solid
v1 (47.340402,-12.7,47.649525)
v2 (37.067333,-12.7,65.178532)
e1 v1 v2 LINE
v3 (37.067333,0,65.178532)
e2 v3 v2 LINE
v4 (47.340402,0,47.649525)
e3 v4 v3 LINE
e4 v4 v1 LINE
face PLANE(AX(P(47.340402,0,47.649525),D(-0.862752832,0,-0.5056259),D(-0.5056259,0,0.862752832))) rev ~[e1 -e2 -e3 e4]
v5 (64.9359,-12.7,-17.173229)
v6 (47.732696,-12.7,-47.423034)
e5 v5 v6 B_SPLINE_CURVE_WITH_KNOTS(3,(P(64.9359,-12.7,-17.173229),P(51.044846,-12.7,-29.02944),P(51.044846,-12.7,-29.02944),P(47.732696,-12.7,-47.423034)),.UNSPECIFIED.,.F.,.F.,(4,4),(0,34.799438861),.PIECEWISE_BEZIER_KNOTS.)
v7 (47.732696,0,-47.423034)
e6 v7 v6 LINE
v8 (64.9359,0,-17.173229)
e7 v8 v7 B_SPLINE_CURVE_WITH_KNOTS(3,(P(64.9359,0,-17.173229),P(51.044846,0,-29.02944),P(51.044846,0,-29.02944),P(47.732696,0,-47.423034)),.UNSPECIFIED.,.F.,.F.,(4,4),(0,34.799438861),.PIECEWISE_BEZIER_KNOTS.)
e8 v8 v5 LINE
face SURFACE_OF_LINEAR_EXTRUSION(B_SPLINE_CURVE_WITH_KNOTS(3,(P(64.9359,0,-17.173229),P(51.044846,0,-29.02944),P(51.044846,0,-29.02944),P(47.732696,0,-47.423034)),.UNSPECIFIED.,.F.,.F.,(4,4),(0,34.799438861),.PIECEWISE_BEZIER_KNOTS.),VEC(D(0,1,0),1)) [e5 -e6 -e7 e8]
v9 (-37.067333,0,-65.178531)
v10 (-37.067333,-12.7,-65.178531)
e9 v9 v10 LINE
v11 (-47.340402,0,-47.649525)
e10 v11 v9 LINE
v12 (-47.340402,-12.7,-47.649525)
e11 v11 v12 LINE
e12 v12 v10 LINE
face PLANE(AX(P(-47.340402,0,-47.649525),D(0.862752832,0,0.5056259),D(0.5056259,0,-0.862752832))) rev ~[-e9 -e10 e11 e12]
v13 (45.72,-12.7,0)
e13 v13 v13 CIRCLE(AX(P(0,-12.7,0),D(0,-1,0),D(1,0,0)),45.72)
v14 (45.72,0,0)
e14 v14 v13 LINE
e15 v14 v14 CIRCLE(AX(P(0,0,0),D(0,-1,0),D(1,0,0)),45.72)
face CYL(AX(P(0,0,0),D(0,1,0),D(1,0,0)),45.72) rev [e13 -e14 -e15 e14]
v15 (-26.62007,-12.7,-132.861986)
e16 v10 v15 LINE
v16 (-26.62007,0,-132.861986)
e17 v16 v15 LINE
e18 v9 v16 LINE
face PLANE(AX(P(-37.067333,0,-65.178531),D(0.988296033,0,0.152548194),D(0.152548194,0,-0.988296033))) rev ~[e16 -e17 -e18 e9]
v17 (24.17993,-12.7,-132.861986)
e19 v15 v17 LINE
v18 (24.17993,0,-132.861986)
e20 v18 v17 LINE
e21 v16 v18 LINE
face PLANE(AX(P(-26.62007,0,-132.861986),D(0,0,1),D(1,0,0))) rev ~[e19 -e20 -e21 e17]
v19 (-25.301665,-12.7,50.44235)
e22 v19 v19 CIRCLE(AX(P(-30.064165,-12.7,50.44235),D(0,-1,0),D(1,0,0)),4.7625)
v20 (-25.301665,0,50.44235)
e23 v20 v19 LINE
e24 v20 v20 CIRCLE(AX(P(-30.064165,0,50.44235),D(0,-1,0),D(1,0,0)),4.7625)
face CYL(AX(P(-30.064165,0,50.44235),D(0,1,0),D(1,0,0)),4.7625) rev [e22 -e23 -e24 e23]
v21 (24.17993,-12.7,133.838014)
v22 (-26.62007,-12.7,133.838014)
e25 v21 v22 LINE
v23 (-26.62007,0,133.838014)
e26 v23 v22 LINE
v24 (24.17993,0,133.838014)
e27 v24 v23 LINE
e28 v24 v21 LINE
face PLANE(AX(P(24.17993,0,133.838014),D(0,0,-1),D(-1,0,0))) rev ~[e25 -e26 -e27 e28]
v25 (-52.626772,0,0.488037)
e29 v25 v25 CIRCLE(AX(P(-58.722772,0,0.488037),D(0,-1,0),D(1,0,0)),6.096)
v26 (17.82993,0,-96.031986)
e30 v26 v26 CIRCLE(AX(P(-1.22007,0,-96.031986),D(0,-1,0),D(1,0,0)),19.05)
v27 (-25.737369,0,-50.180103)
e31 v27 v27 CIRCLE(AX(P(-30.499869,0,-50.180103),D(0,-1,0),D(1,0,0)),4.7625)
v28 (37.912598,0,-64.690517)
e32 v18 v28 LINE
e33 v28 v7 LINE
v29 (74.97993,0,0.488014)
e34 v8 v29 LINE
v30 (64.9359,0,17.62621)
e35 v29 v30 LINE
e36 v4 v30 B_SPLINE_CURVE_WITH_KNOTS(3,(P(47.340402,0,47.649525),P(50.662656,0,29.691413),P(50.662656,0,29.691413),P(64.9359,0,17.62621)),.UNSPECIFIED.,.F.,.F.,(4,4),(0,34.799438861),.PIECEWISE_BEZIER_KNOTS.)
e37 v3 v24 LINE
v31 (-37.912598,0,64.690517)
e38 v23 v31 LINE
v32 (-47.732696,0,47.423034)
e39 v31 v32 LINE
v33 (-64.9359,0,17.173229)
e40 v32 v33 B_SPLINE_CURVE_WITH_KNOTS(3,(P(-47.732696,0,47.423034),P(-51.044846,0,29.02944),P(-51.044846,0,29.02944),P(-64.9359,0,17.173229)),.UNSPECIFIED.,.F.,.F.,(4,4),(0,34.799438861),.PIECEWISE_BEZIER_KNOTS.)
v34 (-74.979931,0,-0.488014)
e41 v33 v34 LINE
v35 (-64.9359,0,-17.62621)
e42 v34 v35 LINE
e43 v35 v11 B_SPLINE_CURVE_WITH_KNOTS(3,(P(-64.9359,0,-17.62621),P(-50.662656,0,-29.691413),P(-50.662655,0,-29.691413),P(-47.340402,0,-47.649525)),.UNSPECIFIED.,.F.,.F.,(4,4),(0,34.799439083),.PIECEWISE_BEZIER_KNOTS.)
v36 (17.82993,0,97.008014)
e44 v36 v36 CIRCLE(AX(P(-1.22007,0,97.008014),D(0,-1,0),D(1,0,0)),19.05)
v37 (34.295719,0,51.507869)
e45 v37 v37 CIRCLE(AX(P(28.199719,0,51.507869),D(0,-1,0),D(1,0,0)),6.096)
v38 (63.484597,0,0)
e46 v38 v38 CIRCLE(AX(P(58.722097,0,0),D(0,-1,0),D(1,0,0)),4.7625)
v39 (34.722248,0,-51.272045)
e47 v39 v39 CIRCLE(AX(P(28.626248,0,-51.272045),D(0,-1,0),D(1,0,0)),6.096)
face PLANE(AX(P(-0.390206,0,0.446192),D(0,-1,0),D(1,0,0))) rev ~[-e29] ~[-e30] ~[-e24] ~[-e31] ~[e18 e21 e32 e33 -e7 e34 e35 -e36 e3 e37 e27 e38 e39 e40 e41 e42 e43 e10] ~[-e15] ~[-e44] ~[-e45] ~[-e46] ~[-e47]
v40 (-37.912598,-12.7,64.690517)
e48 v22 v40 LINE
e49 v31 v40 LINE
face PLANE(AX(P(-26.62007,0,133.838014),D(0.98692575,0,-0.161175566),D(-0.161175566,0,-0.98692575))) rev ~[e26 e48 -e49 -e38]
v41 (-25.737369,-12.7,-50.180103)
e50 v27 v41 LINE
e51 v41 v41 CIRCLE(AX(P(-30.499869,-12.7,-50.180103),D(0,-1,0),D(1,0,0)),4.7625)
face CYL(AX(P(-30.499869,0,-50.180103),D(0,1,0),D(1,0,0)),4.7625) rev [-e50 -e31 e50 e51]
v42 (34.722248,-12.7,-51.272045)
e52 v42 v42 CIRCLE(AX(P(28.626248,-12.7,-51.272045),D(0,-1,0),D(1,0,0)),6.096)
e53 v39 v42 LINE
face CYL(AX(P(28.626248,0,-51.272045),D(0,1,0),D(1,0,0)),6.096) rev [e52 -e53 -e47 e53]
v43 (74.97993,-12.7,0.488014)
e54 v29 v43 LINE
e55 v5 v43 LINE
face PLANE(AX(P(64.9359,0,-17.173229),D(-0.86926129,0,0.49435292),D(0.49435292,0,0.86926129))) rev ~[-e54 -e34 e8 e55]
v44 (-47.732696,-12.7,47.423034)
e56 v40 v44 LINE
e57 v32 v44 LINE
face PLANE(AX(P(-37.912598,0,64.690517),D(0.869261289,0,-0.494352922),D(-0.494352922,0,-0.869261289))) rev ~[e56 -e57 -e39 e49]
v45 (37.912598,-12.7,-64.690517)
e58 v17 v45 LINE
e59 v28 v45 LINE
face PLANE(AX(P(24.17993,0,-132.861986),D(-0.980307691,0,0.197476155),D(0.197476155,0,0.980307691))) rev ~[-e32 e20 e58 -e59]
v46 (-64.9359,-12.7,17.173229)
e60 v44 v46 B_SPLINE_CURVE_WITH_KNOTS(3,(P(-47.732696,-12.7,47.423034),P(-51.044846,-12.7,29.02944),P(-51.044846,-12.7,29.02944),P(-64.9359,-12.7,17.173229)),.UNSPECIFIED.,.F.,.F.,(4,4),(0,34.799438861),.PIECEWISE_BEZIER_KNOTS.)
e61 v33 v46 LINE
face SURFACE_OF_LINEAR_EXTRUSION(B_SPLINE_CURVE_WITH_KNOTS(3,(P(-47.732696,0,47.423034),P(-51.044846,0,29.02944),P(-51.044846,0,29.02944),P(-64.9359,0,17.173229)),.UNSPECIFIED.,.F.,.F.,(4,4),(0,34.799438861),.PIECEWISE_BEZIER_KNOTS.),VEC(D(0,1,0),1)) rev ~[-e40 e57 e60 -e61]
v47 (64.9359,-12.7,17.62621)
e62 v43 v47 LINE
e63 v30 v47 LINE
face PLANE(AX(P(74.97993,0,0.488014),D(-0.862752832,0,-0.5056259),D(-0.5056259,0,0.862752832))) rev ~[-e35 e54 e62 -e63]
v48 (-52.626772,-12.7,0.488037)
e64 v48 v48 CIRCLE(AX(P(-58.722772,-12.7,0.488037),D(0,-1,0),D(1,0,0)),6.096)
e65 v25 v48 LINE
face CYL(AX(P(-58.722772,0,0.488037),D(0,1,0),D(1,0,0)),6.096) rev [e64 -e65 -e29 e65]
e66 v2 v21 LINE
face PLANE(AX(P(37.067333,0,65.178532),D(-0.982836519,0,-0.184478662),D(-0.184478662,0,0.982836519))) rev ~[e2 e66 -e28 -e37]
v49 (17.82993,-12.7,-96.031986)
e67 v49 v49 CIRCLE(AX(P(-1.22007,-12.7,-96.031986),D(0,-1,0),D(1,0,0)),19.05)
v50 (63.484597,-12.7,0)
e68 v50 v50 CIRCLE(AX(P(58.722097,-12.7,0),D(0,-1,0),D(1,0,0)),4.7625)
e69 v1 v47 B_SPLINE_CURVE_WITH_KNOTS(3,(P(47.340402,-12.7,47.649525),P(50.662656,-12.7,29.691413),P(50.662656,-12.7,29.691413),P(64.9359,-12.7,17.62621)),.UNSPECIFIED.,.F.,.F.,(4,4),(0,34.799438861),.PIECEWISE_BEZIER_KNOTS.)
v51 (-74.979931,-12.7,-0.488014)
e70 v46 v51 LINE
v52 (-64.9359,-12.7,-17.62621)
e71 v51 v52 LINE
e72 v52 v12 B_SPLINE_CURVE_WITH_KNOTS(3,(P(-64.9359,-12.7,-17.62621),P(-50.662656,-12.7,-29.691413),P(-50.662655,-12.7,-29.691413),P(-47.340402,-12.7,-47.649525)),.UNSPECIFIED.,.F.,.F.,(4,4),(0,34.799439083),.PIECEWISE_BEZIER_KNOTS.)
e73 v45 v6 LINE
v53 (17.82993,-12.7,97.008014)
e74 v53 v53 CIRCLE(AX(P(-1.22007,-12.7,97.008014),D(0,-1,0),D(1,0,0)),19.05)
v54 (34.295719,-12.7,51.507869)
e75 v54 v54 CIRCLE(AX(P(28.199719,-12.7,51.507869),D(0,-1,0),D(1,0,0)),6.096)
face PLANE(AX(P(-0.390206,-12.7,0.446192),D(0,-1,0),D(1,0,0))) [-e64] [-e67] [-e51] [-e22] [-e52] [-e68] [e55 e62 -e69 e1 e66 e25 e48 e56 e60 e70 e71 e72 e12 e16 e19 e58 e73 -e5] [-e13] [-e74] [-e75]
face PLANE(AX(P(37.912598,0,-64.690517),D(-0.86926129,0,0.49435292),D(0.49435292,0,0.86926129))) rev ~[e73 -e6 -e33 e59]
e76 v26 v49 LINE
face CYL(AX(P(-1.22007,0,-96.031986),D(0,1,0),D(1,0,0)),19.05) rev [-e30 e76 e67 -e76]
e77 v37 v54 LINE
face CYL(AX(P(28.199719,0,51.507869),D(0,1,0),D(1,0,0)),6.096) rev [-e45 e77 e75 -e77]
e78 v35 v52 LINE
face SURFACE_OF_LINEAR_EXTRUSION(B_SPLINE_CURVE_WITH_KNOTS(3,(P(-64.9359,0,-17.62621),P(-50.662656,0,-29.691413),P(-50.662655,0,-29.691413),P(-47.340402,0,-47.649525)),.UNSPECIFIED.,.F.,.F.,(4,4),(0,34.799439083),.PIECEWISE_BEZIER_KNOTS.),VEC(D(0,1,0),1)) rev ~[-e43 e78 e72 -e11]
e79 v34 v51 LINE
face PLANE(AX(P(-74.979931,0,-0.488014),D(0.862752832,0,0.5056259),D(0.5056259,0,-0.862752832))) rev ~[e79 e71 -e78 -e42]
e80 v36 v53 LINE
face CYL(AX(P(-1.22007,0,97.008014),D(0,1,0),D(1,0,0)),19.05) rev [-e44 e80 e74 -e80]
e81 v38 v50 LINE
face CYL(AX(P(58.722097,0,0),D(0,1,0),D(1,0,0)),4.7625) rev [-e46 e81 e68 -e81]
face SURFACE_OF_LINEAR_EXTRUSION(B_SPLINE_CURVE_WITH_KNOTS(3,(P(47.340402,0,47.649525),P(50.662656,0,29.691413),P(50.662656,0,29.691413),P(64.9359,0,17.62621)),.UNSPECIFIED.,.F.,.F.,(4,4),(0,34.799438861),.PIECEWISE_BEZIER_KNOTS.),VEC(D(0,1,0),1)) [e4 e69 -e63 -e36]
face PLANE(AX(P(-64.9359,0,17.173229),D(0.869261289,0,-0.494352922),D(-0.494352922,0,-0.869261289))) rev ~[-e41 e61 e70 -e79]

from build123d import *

# Parameters (mm, degrees)
F0_R     = 19.05
F0_R_2   = 4.7625
F0_R_3   = 6.096
F0_R_4   = 45.72
F1_DEPTH = 12.7


# Not quite as in the source:
# - ends of sketch curves that miss each other by under 0.0002 mm in the source are joined


with BuildPart() as f1:
    # F0 (on Front) → F1 (new body)
    with BuildSketch(Plane.XZ):
        with BuildLine():
            Line((37.0673326191, 65.1785315794), (24.1799304387, 133.8380140911))
            Line((24.1799304387, 133.8380140911), (-26.6200695613, 133.8380140911))
            Line((-26.6200695613, 133.8380140911), (-37.9125978196, 64.6905174884))
            Line((-37.9125978196, 64.6905174884), (-47.7326956793, 47.4230339812))
            add(Edge.make_bspline(
                [(-47.7326956793, 47.4230339812), (-51.0448461758, 29.0294404336), (-51.0448462531, 29.0294404776), (-64.9358999582, 17.1732288977)],
                knots=[0, 0, 0, 0, 34.7994388611, 34.7994388611, 34.7994388611, 34.7994388611], degree=3))
            Line((-64.9358999582, 17.1732288977), (-74.9799305502, -0.4880138996))
            Line((-74.9799305502, -0.4880138996), (-64.9359000035, -17.6262099378))
            add(Edge.make_bspline(
                [(-64.9359000035, -17.6262099378), (-50.6626559715, -29.6914131837), (-50.6626551721, -29.6914132451), (-47.3404022927, -47.649524558)],
                knots=[0, 0, 0, 0, 34.7994390827, 34.7994390827, 34.7994390827, 34.7994390827], degree=3))
            Line((-47.3404022927, -47.649524558), (-37.0673327313, -65.1785313884))
            Line((-37.0673327313, -65.1785313884), (-26.6200695613, -132.8619859089))
            Line((-26.6200695613, -132.8619859089), (24.1799304387, -132.8619859089))
            Line((24.1799304387, -132.8619859089), (37.9125978196, -64.6905174884))
            Line((37.9125978196, -64.6905174884), (47.7326956902, -47.4230338593))
            add(Edge.make_bspline(
                [(64.9358998918, -17.1732287319), (51.0448461867, -29.0294403117), (51.0448461867, -29.0294403117), (47.7326956902, -47.4230338593)],
                knots=[0, 0, 0, 0, 34.7994388611, 34.7994388611, 34.7994388611, 34.7994388611], degree=3))
            Line((64.9358998918, -17.1732287319), (74.9799304387, 0.4880140911))
            Line((74.9799304387, 0.4880140911), (64.9358998918, 17.6262101292))
            add(Edge.make_bspline(
                [(47.3404022927, 47.649524558), (50.662655861, 29.6914133741), (50.662655861, 29.6914133741), (64.9358998918, 17.6262101292)],
                knots=[0, 0, 0, 0, 34.7994388611, 34.7994388611, 34.7994388611, 34.7994388611], degree=3))
            Line((47.3404022927, 47.649524558), (37.0673326191, 65.1785315794))
        make_face()
        with Locations((-1.2200695613, -96.0319859089)):
            Circle(F0_R, mode=Mode.SUBTRACT)
        with Locations((-30.4998691349, -50.180102728)):
            Circle(F0_R_2, mode=Mode.SUBTRACT)
        with Locations((28.6262483892, -51.2720453093)):
            Circle(F0_R_3, mode=Mode.SUBTRACT)
        Circle(F0_R_4, mode=Mode.SUBTRACT)
        with Locations((58.7220974339, 0)):
            Circle(F0_R_2, mode=Mode.SUBTRACT)
        with Locations((-58.7227720341, 0.4880365509)):
            Circle(F0_R_3, mode=Mode.SUBTRACT)
        with Locations((-30.0641650228, 50.4423503469)):
            Circle(F0_R_2, mode=Mode.SUBTRACT)
        with Locations((-1.2200695613, 97.0080140911)):
            Circle(F0_R, mode=Mode.SUBTRACT)
        with Locations((28.1997188878, 51.5078691239)):
            Circle(F0_R_3, mode=Mode.SUBTRACT)
    extrude(amount=F1_DEPTH)


solid = f1.part
